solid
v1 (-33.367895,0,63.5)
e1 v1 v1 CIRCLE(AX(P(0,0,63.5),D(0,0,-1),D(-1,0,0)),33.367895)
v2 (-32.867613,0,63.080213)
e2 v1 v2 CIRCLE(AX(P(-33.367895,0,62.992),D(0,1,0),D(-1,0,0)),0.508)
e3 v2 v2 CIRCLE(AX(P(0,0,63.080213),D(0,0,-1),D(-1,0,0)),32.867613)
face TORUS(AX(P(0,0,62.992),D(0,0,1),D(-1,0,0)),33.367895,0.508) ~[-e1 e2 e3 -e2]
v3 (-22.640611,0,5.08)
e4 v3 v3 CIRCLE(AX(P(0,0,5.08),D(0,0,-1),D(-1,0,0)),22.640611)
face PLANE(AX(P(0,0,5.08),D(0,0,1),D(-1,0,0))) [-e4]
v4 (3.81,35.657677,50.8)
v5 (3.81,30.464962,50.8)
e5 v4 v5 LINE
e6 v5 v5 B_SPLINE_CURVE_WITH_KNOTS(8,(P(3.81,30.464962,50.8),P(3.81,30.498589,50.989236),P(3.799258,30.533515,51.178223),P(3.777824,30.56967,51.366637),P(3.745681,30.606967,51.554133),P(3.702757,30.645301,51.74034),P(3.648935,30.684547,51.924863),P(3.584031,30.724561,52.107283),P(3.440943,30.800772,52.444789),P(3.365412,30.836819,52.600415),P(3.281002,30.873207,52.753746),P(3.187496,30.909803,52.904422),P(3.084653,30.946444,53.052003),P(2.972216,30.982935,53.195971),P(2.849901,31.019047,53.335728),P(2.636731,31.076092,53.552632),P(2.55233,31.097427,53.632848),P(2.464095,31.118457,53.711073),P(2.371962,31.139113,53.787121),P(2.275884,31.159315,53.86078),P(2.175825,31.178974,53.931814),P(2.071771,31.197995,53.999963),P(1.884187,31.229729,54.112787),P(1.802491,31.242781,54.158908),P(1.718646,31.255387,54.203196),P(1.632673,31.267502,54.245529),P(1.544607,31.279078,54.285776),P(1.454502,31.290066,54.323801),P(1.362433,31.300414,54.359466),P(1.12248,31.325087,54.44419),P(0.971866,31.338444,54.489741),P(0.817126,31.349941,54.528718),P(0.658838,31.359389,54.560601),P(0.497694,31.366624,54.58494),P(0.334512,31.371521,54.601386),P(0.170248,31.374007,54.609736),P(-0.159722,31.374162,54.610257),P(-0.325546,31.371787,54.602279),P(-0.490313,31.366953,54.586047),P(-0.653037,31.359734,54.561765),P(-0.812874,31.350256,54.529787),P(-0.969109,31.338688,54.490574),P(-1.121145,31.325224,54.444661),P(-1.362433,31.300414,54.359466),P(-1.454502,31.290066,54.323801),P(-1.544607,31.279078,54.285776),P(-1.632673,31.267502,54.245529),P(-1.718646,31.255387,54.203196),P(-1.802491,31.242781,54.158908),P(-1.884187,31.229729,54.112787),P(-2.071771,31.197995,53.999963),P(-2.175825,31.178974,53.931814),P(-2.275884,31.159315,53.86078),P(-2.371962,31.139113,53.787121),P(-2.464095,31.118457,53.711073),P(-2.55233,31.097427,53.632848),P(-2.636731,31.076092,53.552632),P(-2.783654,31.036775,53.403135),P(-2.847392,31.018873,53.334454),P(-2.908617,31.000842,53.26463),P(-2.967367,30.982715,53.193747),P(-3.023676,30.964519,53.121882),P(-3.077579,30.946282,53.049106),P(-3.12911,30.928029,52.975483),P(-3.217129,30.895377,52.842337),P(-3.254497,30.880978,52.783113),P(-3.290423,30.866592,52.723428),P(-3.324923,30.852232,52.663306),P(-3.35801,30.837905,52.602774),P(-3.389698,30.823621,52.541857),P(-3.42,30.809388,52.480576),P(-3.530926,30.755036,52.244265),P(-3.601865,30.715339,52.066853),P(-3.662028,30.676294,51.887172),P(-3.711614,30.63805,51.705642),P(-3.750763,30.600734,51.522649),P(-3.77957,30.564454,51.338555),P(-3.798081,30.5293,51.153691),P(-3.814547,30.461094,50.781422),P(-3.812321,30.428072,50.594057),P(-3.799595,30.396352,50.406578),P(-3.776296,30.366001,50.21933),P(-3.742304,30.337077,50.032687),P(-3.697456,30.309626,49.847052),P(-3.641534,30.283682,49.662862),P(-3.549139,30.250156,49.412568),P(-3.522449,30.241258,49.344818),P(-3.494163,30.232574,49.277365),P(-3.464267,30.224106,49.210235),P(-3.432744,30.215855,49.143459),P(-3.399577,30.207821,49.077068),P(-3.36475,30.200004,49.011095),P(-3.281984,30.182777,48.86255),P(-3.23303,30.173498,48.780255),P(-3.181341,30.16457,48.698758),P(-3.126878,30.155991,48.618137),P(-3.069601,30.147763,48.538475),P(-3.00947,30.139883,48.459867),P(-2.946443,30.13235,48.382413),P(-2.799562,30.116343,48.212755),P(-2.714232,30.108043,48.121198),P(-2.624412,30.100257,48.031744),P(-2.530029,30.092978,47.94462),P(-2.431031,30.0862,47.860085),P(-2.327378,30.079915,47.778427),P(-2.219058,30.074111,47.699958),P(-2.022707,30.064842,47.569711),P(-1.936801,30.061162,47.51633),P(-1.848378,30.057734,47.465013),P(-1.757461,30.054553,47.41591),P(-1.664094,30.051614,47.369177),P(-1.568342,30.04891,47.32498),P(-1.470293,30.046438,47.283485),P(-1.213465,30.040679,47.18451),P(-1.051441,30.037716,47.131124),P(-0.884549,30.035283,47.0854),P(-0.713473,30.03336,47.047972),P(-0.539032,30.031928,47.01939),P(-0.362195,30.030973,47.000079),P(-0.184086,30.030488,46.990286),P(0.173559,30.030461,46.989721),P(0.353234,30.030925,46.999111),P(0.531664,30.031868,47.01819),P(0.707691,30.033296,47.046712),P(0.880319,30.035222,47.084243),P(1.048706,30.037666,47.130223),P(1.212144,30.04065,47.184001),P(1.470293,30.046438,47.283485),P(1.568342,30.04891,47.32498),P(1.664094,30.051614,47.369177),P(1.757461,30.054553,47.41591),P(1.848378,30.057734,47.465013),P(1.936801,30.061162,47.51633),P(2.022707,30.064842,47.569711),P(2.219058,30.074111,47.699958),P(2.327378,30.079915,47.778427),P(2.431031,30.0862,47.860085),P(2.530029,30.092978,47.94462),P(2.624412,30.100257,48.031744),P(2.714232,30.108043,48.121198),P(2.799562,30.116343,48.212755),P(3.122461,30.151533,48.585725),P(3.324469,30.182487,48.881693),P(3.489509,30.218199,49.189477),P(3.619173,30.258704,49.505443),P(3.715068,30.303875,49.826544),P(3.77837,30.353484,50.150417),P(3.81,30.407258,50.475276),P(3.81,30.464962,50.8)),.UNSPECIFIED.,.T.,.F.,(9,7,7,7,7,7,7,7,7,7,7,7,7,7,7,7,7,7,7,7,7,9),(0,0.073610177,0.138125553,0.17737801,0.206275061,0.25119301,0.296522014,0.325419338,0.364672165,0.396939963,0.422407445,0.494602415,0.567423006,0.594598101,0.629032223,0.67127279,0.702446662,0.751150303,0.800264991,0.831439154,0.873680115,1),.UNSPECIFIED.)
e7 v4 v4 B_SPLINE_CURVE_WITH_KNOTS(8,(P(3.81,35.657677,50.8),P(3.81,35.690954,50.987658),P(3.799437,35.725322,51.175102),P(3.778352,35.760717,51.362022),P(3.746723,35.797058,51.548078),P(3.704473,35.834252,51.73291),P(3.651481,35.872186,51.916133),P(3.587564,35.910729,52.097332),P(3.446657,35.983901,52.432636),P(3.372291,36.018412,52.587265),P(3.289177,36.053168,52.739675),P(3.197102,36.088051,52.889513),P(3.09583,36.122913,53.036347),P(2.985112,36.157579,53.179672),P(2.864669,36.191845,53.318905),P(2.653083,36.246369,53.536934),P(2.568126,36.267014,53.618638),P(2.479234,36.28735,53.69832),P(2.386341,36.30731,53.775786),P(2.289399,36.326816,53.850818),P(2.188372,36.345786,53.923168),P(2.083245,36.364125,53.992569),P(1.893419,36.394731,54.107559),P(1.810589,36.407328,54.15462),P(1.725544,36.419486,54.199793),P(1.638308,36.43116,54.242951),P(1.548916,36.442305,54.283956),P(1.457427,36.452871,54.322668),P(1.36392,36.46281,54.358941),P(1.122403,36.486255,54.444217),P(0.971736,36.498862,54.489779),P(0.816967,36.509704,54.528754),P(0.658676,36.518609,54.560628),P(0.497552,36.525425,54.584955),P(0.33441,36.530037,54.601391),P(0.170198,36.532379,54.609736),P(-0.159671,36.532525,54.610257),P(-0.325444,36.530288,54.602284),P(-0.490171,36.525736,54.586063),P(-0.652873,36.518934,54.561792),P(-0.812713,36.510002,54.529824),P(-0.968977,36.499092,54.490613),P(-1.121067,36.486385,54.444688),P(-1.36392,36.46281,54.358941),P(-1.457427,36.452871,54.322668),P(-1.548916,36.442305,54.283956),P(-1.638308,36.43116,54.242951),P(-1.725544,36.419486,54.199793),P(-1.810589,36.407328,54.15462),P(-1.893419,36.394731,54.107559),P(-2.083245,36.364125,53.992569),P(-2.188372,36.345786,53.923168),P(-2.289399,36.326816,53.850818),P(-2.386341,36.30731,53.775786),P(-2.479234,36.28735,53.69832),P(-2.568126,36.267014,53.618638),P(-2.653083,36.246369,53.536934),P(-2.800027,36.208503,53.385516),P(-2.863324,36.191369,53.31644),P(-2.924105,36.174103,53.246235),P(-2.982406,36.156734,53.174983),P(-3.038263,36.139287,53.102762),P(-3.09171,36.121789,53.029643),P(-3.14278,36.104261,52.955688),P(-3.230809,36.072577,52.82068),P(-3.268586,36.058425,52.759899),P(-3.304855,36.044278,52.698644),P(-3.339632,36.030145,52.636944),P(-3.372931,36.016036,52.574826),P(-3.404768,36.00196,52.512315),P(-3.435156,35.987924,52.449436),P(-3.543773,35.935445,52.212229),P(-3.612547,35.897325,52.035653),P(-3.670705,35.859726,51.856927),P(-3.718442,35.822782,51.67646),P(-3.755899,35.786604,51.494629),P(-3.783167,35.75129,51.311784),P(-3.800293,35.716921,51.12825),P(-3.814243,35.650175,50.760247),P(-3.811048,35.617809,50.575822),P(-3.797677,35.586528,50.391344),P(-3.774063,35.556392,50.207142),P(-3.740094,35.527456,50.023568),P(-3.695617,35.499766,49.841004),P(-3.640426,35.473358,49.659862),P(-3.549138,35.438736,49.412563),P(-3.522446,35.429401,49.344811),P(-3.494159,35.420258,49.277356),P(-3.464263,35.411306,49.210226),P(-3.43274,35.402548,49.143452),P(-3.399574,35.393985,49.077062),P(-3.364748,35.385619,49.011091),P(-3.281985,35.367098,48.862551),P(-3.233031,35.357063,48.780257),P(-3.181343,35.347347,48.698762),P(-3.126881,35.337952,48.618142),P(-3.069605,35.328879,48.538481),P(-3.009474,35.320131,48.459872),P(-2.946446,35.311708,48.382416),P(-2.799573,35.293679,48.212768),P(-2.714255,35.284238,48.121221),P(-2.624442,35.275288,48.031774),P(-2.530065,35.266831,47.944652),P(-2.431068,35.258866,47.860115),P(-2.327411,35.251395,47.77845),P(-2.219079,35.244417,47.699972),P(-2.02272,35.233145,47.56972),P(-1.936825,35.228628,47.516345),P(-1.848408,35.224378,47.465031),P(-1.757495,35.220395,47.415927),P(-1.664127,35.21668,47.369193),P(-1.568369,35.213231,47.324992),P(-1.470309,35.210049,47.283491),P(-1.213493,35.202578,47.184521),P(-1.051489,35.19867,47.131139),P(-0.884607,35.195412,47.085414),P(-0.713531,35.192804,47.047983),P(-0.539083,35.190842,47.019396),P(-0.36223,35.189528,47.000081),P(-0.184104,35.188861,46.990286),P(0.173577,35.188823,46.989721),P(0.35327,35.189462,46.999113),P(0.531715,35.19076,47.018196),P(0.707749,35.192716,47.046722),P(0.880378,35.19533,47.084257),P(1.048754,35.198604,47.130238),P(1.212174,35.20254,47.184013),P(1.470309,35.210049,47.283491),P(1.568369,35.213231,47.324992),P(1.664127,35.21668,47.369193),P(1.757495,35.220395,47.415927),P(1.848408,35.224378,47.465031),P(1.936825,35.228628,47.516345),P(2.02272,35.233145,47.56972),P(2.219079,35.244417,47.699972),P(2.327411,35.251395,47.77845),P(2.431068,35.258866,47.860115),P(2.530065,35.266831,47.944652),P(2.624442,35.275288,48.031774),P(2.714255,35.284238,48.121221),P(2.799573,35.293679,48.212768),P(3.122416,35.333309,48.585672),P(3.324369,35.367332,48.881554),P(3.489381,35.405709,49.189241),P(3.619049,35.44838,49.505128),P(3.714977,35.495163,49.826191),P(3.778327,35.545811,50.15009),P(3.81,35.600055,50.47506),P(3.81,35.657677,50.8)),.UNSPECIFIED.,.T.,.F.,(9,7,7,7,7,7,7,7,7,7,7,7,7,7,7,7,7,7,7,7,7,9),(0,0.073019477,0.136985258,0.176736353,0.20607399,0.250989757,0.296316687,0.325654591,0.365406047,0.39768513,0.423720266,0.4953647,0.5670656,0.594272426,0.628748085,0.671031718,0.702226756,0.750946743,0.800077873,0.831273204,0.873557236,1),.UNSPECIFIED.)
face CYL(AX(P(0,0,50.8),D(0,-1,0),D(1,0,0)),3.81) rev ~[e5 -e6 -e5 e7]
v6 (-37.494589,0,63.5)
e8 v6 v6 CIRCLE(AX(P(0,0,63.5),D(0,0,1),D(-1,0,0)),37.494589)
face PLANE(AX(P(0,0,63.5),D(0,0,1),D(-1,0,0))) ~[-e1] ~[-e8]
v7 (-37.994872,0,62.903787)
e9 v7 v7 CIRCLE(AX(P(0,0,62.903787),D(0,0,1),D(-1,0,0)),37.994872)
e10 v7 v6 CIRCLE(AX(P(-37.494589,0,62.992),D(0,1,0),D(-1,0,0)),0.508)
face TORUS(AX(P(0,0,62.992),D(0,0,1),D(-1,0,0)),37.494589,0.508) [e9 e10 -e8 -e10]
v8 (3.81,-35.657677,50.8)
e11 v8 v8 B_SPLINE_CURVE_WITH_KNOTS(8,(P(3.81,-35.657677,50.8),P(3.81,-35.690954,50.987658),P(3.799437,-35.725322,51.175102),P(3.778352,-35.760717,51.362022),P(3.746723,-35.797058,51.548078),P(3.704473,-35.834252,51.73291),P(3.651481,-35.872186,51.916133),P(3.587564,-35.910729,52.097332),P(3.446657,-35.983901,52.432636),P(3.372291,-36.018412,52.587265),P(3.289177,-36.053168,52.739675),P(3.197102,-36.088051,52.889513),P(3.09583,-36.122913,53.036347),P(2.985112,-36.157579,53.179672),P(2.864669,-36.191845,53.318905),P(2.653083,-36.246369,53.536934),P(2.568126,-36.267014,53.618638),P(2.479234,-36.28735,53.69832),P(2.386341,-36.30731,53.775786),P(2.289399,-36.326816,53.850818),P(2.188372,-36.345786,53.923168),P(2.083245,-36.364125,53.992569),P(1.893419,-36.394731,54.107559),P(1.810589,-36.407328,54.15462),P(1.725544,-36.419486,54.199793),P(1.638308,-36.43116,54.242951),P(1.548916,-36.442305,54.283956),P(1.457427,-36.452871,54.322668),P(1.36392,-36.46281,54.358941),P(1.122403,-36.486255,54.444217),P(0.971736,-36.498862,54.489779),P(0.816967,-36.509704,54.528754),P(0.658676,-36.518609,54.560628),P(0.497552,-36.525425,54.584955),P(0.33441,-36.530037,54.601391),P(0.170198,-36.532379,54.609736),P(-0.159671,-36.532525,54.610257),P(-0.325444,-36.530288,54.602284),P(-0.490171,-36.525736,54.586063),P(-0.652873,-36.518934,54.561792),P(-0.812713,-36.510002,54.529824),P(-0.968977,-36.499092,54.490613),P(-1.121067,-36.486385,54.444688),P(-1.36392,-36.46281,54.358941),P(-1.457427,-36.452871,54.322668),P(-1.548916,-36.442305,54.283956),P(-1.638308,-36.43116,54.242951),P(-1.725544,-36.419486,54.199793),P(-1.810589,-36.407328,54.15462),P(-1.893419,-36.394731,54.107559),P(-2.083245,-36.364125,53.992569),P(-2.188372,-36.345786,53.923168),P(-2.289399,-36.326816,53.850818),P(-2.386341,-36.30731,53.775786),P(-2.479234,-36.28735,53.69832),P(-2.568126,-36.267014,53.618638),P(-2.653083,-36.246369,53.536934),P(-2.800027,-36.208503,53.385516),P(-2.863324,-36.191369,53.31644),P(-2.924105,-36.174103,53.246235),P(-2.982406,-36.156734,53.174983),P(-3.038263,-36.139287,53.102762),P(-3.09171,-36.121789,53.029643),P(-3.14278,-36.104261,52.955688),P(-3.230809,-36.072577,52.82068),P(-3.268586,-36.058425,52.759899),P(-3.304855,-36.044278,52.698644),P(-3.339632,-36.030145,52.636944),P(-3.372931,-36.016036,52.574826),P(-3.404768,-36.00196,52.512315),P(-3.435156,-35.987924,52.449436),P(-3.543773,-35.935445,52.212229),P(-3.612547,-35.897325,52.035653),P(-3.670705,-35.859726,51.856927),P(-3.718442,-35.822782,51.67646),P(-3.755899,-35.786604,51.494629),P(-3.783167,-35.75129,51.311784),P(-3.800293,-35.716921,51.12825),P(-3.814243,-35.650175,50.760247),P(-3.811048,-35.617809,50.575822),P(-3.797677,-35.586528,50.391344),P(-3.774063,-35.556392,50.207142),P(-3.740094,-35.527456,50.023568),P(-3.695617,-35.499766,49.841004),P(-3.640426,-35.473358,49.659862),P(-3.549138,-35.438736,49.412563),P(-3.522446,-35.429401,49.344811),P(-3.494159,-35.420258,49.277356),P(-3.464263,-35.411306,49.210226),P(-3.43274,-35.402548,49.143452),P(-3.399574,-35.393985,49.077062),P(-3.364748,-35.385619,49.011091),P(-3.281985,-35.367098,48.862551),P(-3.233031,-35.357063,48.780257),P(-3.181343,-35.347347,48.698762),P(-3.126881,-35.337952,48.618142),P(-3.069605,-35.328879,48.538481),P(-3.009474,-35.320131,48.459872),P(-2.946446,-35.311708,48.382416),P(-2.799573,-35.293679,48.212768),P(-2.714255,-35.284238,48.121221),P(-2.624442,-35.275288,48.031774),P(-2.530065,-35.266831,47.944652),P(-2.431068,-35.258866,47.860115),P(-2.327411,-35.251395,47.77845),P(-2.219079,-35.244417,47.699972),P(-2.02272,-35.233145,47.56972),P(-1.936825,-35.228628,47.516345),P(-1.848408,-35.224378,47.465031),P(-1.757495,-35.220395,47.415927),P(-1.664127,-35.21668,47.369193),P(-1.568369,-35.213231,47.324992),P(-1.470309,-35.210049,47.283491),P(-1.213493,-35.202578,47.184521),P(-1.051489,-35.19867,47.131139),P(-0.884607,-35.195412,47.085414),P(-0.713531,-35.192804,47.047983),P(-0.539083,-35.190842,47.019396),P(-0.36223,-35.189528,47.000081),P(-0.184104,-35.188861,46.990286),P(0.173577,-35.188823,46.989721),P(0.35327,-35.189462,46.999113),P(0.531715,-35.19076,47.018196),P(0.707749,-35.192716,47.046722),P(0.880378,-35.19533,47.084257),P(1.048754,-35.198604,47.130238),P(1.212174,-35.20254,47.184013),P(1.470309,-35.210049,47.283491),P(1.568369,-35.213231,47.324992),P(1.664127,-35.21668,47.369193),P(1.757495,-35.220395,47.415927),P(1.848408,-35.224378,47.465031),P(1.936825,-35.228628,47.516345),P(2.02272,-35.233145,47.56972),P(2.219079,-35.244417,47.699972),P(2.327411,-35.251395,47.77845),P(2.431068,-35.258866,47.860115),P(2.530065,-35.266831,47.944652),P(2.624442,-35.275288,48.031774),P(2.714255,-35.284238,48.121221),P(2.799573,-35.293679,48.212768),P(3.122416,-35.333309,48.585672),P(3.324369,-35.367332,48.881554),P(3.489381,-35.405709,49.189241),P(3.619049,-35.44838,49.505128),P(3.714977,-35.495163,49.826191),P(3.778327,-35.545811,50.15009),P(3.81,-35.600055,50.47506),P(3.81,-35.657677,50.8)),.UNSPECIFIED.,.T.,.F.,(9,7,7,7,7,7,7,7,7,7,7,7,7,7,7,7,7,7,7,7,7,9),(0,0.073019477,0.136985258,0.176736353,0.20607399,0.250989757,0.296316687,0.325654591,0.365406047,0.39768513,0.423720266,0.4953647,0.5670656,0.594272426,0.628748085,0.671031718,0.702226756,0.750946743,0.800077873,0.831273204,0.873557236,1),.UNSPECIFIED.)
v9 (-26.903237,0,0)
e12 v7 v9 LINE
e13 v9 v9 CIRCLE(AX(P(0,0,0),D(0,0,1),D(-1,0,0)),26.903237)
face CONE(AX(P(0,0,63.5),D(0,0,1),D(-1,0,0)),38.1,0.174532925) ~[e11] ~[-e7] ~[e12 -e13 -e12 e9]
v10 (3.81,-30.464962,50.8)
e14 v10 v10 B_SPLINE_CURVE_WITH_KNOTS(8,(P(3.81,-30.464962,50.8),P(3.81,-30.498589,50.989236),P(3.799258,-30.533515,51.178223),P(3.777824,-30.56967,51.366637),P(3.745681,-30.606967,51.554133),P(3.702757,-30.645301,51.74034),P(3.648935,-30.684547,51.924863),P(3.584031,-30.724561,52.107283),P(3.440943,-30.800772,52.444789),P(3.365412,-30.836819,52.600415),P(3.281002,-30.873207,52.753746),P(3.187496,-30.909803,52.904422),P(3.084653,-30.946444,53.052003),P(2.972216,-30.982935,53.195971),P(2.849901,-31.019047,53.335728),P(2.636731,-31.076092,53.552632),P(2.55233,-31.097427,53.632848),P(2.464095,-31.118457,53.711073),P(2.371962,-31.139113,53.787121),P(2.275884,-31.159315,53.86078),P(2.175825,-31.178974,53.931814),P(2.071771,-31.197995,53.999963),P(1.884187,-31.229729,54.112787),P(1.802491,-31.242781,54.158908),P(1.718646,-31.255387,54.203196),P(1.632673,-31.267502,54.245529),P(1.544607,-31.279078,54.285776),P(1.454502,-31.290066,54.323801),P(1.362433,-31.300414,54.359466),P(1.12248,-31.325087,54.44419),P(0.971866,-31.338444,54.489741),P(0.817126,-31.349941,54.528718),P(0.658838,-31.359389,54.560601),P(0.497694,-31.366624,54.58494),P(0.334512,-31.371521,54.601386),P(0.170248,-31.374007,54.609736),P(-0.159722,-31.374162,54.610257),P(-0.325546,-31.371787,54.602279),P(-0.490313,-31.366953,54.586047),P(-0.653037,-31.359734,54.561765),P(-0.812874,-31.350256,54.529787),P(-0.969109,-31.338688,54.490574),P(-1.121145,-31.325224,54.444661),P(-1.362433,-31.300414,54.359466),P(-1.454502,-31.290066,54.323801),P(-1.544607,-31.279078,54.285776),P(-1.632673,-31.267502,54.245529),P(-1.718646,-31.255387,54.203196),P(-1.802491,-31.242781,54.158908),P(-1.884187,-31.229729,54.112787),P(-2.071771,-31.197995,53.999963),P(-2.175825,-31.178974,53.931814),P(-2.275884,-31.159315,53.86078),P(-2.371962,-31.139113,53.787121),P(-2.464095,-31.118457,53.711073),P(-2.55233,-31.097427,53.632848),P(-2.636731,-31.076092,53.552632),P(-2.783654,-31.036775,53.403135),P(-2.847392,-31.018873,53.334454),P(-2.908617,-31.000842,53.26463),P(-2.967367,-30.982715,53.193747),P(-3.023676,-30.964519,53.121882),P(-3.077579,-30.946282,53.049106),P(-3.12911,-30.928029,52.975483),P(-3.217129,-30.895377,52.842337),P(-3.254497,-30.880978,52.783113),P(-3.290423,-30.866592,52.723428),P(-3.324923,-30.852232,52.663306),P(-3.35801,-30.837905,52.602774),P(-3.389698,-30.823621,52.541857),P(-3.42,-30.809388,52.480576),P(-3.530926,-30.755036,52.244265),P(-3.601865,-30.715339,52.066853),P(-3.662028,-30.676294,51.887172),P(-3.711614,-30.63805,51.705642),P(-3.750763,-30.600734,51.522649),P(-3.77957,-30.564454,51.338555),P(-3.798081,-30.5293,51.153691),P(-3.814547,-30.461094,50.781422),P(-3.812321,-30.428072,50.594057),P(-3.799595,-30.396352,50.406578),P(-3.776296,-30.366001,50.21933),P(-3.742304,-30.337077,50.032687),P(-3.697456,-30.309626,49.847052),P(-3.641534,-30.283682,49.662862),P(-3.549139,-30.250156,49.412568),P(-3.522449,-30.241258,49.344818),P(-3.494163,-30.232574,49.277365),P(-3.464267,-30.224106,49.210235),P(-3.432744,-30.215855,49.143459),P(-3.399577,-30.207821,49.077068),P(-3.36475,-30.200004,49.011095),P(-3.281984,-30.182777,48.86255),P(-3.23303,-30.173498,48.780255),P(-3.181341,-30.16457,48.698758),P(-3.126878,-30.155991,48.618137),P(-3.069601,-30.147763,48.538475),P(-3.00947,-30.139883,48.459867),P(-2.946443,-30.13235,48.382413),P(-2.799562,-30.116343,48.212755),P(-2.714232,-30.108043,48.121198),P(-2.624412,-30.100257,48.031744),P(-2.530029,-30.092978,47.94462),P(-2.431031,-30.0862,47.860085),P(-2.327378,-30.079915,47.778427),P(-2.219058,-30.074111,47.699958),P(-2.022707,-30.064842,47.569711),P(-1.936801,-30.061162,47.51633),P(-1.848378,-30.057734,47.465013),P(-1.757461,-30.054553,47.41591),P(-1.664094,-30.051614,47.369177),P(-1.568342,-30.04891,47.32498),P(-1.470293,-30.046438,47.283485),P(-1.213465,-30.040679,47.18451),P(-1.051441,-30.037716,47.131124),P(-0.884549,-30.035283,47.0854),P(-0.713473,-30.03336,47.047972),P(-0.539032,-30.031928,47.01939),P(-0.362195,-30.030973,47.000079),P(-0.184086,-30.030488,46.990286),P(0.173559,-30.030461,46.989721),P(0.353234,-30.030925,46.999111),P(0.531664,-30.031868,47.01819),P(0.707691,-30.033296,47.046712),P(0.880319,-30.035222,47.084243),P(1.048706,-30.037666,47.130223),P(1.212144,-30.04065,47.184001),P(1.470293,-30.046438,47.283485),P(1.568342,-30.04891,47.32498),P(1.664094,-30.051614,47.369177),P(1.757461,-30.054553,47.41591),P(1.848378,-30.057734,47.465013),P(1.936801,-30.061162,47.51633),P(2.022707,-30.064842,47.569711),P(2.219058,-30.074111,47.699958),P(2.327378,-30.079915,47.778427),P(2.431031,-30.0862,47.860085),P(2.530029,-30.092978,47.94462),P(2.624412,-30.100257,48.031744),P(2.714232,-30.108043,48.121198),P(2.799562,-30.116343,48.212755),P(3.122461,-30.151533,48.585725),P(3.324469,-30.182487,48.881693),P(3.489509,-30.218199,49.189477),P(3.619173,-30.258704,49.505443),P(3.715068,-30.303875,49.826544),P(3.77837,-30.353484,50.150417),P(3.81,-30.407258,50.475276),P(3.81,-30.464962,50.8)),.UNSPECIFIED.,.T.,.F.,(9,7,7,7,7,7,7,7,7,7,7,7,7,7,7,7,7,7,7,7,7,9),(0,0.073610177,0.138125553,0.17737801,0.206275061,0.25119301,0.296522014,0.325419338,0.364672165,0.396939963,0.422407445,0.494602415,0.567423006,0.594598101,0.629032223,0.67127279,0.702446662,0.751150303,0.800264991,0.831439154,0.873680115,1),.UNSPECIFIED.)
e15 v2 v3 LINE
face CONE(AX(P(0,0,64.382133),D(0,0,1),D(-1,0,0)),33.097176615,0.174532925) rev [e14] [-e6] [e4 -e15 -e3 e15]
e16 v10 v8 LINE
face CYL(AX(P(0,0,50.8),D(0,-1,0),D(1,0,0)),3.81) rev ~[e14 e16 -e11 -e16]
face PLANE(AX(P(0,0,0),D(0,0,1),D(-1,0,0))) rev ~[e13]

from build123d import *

# Parameters (mm, degrees)
F2_T     = -5.08
F3_R     = 3.81
F4_DEPTH = 51.816
F5_R     = 0.508


with BuildPart() as f1:
    # F0 (on Front) → F1 (revolve)
    with BuildSketch(Plane.XZ):
        Polygon((0, 0), (0, 63.5), (-38.1, 63.5), (-26.903236725, 0), align=None)
    revolve(axis=Axis((0, 0, 31.75), (0, 0, 1)))

    # F2
    f2_openings = [f1.faces().sort_by_distance(p)[0] for p in [
        (0, 0, 63.5),
    ]]
    offset(amount=F2_T, openings=f2_openings)

    # F3 (on Front) → F4 (cut, symmetric)
    with BuildSketch(Plane.XZ):
        with Locations((0, 50.8)):
            Circle(F3_R)
    extrude(amount=F4_DEPTH, both=True, mode=Mode.SUBTRACT)

    # F5
    f5_edges = [f1.edges().sort_by_distance(p)[0] for p in [
        (38.1, 0, 63.5),
        (32.941633, 0, 63.5),
    ]]
    fillet(f5_edges, radius=F5_R)


solid = f1.part
